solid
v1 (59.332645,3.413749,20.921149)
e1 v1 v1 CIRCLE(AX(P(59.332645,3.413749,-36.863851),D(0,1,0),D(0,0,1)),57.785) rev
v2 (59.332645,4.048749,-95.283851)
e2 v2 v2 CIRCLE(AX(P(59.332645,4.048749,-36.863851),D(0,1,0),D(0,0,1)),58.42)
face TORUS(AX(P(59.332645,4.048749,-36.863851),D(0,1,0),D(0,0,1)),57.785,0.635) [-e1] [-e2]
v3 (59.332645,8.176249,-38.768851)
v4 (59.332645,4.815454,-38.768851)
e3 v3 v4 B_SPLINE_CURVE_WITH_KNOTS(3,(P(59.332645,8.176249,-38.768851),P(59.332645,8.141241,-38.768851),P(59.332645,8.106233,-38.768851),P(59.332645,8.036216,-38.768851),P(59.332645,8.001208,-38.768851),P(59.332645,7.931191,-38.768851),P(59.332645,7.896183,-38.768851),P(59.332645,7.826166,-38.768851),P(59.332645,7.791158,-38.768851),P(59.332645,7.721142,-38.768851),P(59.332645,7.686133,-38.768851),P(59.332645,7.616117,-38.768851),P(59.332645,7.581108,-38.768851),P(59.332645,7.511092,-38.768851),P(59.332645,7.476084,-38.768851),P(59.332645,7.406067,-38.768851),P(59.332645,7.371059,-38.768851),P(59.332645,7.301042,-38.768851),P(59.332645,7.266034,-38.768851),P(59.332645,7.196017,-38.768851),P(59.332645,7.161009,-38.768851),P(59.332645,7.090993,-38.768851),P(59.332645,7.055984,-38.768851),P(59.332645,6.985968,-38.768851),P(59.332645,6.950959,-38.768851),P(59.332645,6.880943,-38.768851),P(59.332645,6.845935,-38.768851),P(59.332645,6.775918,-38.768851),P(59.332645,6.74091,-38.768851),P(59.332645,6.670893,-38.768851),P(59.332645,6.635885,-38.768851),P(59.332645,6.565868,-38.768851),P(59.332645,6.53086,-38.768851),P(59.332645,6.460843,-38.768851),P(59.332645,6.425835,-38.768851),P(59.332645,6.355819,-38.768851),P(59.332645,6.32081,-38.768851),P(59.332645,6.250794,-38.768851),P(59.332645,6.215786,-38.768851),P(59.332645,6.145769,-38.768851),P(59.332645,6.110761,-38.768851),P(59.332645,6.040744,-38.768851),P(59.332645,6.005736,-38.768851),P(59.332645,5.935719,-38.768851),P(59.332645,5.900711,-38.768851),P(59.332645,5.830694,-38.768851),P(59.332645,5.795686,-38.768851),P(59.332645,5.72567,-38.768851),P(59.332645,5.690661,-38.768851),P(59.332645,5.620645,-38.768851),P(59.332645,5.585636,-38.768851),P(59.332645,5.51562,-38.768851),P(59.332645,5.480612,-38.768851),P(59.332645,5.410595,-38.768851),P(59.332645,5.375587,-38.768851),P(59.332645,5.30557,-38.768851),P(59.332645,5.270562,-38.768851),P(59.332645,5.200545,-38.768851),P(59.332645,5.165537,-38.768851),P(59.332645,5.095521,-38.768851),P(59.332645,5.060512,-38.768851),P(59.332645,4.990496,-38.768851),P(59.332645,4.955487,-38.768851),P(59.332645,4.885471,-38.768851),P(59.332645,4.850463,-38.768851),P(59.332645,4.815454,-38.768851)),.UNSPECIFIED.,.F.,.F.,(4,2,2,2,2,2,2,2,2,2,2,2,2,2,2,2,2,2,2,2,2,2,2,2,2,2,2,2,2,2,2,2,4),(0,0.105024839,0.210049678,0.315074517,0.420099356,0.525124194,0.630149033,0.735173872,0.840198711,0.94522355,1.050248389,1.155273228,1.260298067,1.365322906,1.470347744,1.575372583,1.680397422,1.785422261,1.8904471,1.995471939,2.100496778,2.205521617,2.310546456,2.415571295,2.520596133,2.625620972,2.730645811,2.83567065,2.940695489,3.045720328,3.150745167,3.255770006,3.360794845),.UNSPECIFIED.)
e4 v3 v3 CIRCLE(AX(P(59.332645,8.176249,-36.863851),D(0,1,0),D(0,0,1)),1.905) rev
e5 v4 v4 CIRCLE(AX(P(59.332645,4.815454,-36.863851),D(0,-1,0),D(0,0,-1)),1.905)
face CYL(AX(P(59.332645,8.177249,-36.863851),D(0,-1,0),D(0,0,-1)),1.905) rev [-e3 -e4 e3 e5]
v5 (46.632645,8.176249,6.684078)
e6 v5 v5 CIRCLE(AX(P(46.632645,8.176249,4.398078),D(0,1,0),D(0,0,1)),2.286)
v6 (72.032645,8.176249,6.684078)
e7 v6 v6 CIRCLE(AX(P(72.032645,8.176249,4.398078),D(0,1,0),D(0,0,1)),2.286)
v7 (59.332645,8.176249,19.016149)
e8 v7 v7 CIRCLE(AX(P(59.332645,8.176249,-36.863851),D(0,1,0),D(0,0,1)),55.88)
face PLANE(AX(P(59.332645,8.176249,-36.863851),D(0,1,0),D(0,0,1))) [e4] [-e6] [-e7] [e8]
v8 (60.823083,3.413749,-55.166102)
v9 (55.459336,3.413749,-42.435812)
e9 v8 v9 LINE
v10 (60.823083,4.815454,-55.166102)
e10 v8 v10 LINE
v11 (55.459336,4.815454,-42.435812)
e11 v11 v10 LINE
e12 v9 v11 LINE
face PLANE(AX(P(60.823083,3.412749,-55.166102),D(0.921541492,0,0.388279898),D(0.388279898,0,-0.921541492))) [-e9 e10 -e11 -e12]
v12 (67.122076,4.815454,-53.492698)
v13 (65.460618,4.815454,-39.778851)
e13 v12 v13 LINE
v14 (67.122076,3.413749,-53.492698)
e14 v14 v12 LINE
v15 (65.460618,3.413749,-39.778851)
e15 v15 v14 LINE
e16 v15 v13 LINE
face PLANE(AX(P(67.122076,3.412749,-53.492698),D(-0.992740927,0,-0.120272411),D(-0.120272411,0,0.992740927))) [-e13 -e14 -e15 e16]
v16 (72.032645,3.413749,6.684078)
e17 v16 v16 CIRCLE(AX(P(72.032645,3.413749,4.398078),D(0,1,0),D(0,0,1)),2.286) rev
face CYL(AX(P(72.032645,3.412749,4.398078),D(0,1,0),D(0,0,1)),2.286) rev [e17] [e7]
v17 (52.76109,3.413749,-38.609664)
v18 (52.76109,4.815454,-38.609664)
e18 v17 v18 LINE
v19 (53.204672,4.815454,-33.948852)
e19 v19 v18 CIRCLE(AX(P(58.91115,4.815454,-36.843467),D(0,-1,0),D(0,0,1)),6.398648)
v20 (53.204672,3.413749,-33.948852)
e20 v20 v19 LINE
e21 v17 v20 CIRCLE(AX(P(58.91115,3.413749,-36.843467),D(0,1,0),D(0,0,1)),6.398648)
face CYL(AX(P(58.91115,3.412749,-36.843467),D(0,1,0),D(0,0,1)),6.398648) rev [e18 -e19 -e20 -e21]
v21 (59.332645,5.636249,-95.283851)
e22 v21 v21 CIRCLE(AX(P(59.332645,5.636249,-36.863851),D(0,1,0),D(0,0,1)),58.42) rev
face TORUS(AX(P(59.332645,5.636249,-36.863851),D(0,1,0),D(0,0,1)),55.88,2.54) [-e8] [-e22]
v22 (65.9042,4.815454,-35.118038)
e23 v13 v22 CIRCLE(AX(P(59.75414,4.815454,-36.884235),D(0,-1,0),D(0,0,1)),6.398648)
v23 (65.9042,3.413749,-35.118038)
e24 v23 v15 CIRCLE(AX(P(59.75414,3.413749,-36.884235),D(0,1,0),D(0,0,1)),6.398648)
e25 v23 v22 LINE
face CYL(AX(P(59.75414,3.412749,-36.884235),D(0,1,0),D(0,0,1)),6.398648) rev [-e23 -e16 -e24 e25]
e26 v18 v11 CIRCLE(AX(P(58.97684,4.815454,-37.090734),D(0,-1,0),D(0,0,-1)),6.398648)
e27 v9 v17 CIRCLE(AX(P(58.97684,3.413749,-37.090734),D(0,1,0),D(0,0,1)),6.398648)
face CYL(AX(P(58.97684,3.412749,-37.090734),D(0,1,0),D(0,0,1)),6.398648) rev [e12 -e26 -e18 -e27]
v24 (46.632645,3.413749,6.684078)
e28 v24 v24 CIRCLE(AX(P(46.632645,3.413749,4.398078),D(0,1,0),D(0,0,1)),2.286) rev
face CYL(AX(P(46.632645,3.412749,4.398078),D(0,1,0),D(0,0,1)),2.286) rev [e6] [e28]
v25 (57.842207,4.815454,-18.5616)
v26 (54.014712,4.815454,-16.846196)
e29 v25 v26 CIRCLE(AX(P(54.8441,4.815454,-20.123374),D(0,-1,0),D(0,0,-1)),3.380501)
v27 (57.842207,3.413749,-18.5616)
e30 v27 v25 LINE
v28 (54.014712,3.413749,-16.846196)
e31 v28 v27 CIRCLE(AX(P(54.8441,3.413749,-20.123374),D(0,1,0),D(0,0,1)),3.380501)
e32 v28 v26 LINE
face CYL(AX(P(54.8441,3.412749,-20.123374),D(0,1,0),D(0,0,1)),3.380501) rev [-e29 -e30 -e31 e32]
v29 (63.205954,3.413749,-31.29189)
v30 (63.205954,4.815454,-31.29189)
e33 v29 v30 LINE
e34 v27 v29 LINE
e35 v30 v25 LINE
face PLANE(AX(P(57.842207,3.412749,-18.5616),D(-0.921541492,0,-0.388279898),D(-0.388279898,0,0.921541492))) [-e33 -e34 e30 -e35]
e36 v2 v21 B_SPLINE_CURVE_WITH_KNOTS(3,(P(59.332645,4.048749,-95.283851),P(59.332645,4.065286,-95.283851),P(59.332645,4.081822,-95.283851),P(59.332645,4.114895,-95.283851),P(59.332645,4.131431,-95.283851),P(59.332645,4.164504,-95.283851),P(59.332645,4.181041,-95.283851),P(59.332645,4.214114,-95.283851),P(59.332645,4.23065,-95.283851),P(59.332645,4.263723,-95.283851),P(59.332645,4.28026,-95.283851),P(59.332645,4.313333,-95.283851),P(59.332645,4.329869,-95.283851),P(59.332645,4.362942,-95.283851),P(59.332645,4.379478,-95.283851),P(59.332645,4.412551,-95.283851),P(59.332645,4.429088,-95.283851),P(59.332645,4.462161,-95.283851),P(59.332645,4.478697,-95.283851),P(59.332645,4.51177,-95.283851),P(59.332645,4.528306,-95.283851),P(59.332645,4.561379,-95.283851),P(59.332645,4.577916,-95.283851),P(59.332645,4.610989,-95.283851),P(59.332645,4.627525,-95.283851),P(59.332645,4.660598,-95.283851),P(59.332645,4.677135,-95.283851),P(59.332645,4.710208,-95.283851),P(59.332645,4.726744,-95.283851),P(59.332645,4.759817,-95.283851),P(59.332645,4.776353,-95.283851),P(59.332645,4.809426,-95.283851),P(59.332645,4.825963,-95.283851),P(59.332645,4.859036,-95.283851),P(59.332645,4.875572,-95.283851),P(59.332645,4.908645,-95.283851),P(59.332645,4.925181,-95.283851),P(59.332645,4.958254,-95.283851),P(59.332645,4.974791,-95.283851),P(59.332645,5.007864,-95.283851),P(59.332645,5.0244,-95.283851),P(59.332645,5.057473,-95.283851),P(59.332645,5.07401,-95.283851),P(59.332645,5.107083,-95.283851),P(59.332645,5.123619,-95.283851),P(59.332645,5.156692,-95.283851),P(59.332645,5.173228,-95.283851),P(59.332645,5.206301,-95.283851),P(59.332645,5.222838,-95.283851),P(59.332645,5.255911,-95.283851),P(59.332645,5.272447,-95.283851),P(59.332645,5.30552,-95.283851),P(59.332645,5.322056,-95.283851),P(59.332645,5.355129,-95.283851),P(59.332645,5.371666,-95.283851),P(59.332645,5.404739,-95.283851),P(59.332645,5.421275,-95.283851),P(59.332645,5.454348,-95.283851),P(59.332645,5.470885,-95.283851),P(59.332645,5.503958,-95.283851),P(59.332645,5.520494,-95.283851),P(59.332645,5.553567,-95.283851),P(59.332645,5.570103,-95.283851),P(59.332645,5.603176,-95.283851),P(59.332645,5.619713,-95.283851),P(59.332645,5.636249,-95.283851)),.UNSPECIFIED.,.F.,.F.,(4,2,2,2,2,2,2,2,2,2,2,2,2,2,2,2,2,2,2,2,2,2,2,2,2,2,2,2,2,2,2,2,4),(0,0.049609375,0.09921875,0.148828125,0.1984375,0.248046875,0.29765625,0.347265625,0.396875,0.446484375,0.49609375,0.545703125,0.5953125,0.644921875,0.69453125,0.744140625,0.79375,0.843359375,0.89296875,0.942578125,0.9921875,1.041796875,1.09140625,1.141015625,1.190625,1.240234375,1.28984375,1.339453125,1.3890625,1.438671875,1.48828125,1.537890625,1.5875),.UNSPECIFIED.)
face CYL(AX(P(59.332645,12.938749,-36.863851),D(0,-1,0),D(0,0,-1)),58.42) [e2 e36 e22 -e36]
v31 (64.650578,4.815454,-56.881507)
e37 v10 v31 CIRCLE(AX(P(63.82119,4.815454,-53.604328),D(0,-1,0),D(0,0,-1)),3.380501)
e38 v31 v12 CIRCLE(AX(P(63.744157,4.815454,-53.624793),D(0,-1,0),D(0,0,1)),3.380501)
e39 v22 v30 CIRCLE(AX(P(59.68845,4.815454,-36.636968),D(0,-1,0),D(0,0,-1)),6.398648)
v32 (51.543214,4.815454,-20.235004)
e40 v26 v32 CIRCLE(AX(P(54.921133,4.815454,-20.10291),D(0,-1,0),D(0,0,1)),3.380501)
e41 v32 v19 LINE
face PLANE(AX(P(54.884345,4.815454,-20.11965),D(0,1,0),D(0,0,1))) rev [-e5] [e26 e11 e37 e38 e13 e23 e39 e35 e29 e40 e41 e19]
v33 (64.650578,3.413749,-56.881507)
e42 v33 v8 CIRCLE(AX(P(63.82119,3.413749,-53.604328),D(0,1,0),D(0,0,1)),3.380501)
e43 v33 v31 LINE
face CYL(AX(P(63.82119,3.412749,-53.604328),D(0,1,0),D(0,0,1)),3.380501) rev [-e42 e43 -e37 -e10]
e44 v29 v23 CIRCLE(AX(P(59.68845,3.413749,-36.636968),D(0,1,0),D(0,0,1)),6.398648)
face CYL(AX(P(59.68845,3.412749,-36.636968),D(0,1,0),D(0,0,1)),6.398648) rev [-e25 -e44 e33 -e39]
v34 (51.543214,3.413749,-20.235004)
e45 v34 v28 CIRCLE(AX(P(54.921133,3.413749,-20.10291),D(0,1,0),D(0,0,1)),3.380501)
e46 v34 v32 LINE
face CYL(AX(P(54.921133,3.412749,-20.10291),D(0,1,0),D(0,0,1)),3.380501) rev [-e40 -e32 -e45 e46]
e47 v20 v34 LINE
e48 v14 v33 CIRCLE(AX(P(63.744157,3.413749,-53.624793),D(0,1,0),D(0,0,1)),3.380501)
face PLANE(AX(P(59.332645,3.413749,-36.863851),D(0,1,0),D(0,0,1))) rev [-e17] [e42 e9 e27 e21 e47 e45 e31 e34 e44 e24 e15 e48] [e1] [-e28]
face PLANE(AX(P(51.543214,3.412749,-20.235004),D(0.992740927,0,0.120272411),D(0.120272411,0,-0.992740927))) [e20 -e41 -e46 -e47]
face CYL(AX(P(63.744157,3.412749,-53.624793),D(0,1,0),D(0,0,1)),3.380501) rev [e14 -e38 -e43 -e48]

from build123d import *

# Parameters (mm, degrees)
COMBINE1_START         = 3.413749169
COMBINE1_OUTLINE_R     = 58.42
COMBINE1_OUTLINE_R_2   = 4.935
COMBINE1_OUTLINE_R_3   = 3.57
COMBINE1_OUTLINE_R_4   = 0.7875
COMBINE1_OUTLINE_R_5   = 3.15
COMBINE1_DEPTH         = 9.525
COMBINE1_START_2       = 4.053454325
COMBINE1_2_OUTLINE_R   = 0.7875
COMBINE1_2_OUTLINE_R_2 = 4.935
COMBINE1_2_OUTLINE_R_3 = 3.57
COMBINE1_2_OUTLINE_R_4 = 3.15
COMBINE1_2_DEPTH       = 8.885294844
CUT_EXTRUDE1_DEPTH     = 0.762
CUT_EXTRUDE2_START     = -4.7625
SKETCH4_R              = 58.42
CUT_EXTRUDE2_DEPTH     = 4.7625
CUT_EXTRUDE3_REACH     = 153.512
SKETCH7_R              = 1.905
FILLET2_R              = 2.54
FILLET5_R              = 0.635
SKETCH9_R              = 1.999996
CUT_EXTRUDE5_DEPTH     = 152.549922909
CUT_EXTRUDE6_REACH     = 153.55
SKETCH10_R             = 2.286
CUT_EXTRUDE9_REACH     = 153.512


with BuildPart() as part:
    # Combine1: read off the stored shape, not the designer's step
    # Combine1 outline → Combine1 (new body)
    # profile 1 of 11: a face of its own
    with BuildSketch(Plane(origin=(0, 0, 0), x_dir=(1, 0, 0), z_dir=(0, 1, 0)).offset(COMBINE1_START)):
        with Locations((59.332644984, 36.863851119)):
            Circle(COMBINE1_OUTLINE_R)
        with BuildLine():
            Line((55.998151143, 41.896996961), (61.361898263, 54.627286485))
            ThreePointArc((61.361898263, 54.627286485), (64.45492948, 56.145051848), (66.38688961, 53.292336674))
            Line((66.38688961, 53.292336674), (64.725431473, 39.578489242))
            ThreePointArc((64.725431473, 39.578489242), (65.167745205, 35.313686074), (62.667138826, 31.830705276))
            Line((62.667138826, 31.830705276), (57.303391705, 19.100415753))
            ThreePointArc((57.303391705, 19.100415753), (54.210360488, 17.58265039), (52.278400358, 20.435365564))
            Line((52.278400358, 20.435365564), (53.939858496, 34.149212996))
            ThreePointArc((53.939858496, 34.149212996), (53.32735594, 36.24102711), (53.497544764, 38.414016164))
            ThreePointArc((53.497544764, 38.414016164), (54.428243632, 40.384966514), (55.998151143, 41.896996961))
        make_face(mode=Mode.SUBTRACT)
    # profile 2 of 11: a face of its own
    with BuildSketch(Plane(origin=(0, 0, 0), x_dir=(1, 0, 0), z_dir=(0, 1, 0)).offset(COMBINE1_START)):
        with Locations((59.332644984, 36.863851119)):
            Circle(COMBINE1_OUTLINE_R_2)
        with Locations((59.332644984, 36.863851118)):
            Circle(COMBINE1_OUTLINE_R_3, mode=Mode.SUBTRACT)
    # profile 3 of 11: a face of its own
    with BuildSketch(Plane(origin=(0, 0, 0), x_dir=(1, 0, 0), z_dir=(0, 1, 0)).offset(COMBINE1_START)):
        with BuildLine():
            ThreePointArc((61.980902459, 43.765255947), (61.42199787, 44.728551416), (60.458702401, 44.169646828))
            ThreePointArc((60.458702401, 44.169646828), (61.01760699, 43.206351359), (61.980902459, 43.765255947))
        make_face()
    # profile 4 of 11: a face of its own
    with BuildSketch(Plane(origin=(0, 0, 0), x_dir=(1, 0, 0), z_dir=(0, 1, 0)).offset(COMBINE1_START)):
        with BuildLine():
            ThreePointArc((62.789684222, 46.809656062), (62.230779633, 47.772951531), (61.267484164, 47.214046943))
            ThreePointArc((61.267484164, 47.214046943), (61.826388753, 46.250751474), (62.789684222, 46.809656062))
        make_face()
    # profile 5 of 11: a face of its own
    with BuildSketch(Plane(origin=(0, 0, 0), x_dir=(1, 0, 0), z_dir=(0, 1, 0)).offset(COMBINE1_START)):
        with Locations((62.837365955, 50.056251617)):
            Circle(COMBINE1_OUTLINE_R_4)
    # profile 6 of 11: a face of its own
    with BuildSketch(Plane(origin=(0, 0, 0), x_dir=(1, 0, 0), z_dir=(0, 1, 0)).offset(COMBINE1_START)):
        with BuildLine():
            ThreePointArc((64.407247747, 52.898456292), (63.848343158, 53.861751761), (62.885047689, 53.302847173))
            ThreePointArc((62.885047689, 53.302847173), (63.443952278, 52.339551704), (64.407247747, 52.898456292))
        make_face()
    # profile 7 of 11: a face of its own
    with BuildSketch(Plane(origin=(0, 0, 0), x_dir=(1, 0, 0), z_dir=(0, 1, 0)).offset(COMBINE1_START)):
        with Locations((57.445487539, 29.76025085)):
            Circle(COMBINE1_OUTLINE_R_4)
    # profile 8 of 11: a face of its own
    with BuildSketch(Plane(origin=(0, 0, 0), x_dir=(1, 0, 0), z_dir=(0, 1, 0)).offset(COMBINE1_START)):
        with Locations((56.636705775, 26.715850735)):
            Circle(COMBINE1_OUTLINE_R_4)
    # profile 9 of 11: a face of its own
    with BuildSketch(Plane(origin=(0, 0, 0), x_dir=(1, 0, 0), z_dir=(0, 1, 0)).offset(COMBINE1_START)):
        with BuildLine():
            ThreePointArc((56.589024042, 23.46925518), (56.030119453, 24.432550649), (55.066823984, 23.873646061))
            ThreePointArc((55.066823984, 23.873646061), (55.625728573, 22.910350592), (56.589024042, 23.46925518))
        make_face()
    # profile 10 of 11: a face of its own
    with BuildSketch(Plane(origin=(0, 0, 0), x_dir=(1, 0, 0), z_dir=(0, 1, 0)).offset(COMBINE1_START)):
        with BuildLine():
            ThreePointArc((55.780242279, 20.424855065), (55.221337691, 21.388150534), (54.258042222, 20.829245946))
            ThreePointArc((54.258042222, 20.829245946), (54.81694681, 19.865950476), (55.780242279, 20.424855065))
        make_face()
    # profile 11 of 11: a face of its own
    with BuildSketch(Plane(origin=(0, 0, 0), x_dir=(1, 0, 0), z_dir=(0, 1, 0)).offset(COMBINE1_START)):
        with Locations((59.332644984, 36.863851119)):
            Circle(COMBINE1_OUTLINE_R_5)
    extrude(amount=COMBINE1_DEPTH)

    # Combine1 2 outline → Combine1 2 (add)
    # profile 1 of 2: a face of its own
    with BuildSketch(Plane(origin=(0, 0, 0), x_dir=(1, 0, 0), z_dir=(0, 1, 0)).offset(COMBINE1_START_2)):
        with BuildLine():
            ThreePointArc((66.38688961, 53.292336674), (64.45492948, 56.145051848), (61.361898263, 54.627286485))
            Line((61.361898263, 54.627286485), (55.998151143, 41.896996961))
            ThreePointArc((55.998151143, 41.896996961), (54.428243632, 40.384966514), (53.497544764, 38.414016164))
            ThreePointArc((53.497544764, 38.414016164), (53.32735594, 36.24102711), (53.939858496, 34.149212996))
            Line((53.939858496, 34.149212996), (52.278400358, 20.435365564))
            ThreePointArc((52.278400358, 20.435365564), (54.210360488, 17.58265039), (57.303391705, 19.100415753))
            Line((57.303391705, 19.100415753), (62.667138826, 31.830705276))
            ThreePointArc((62.667138826, 31.830705276), (65.167745205, 35.313686074), (64.725431473, 39.578489242))
            Line((64.725431473, 39.578489242), (66.38688961, 53.292336674))
        make_face()
        with BuildLine():
            ThreePointArc((55.780242279, 20.424855065), (54.81694681, 19.865950476), (54.258042222, 20.829245946))
            ThreePointArc((54.258042222, 20.829245946), (55.221337691, 21.388150534), (55.780242279, 20.424855065))
        make_face(mode=Mode.SUBTRACT)
        with BuildLine():
            ThreePointArc((56.589024042, 23.46925518), (55.625728573, 22.910350592), (55.066823984, 23.873646061))
            ThreePointArc((55.066823984, 23.873646061), (56.030119453, 24.432550649), (56.589024042, 23.46925518))
        make_face(mode=Mode.SUBTRACT)
        with Locations((56.636705775, 26.715850735)):
            Circle(COMBINE1_2_OUTLINE_R, mode=Mode.SUBTRACT)
        with Locations((57.445487539, 29.760250851)):
            Circle(COMBINE1_2_OUTLINE_R, mode=Mode.SUBTRACT)
        with Locations((59.332644984, 36.863851119)):
            Circle(COMBINE1_2_OUTLINE_R_2, mode=Mode.SUBTRACT)
        with BuildLine():
            ThreePointArc((61.980902459, 43.765255947), (61.01760699, 43.206351359), (60.458702401, 44.169646828))
            ThreePointArc((60.458702401, 44.169646828), (61.42199787, 44.728551416), (61.980902459, 43.765255947))
        make_face(mode=Mode.SUBTRACT)
        with BuildLine():
            ThreePointArc((62.789684222, 46.809656062), (61.826388753, 46.250751474), (61.267484164, 47.214046943))
            ThreePointArc((61.267484164, 47.214046943), (62.230779633, 47.772951531), (62.789684222, 46.809656062))
        make_face(mode=Mode.SUBTRACT)
        with Locations((62.837365955, 50.056251617)):
            Circle(COMBINE1_2_OUTLINE_R, mode=Mode.SUBTRACT)
        with BuildLine():
            ThreePointArc((64.407247747, 52.898456292), (63.443952278, 52.339551704), (62.885047689, 53.302847173))
            ThreePointArc((62.885047689, 53.302847173), (63.848343158, 53.861751761), (64.407247747, 52.898456292))
        make_face(mode=Mode.SUBTRACT)
    # profile 2 of 2: a face of its own
    with BuildSketch(Plane(origin=(0, 0, 0), x_dir=(1, 0, 0), z_dir=(0, 1, 0)).offset(COMBINE1_START_2)):
        with Locations((59.332644984, 36.863851118)):
            Circle(COMBINE1_2_OUTLINE_R_3)
        with Locations((59.332644984, 36.863851119)):
            Circle(COMBINE1_2_OUTLINE_R_4, mode=Mode.SUBTRACT)
    extrude(amount=COMBINE1_2_DEPTH)

    # Sketch1 → Cut-Extrude1 (cut, symmetric)
    with BuildSketch(Plane.XZ.offset(-4.053454325)):
        with BuildLine():
            Line((52.278400358, -20.435365564), (53.939858496, -34.149212996))
            ThreePointArc((53.939858496, -34.149212996), (53.497544764, -38.414016164), (55.998151143, -41.896996961))
            Line((55.998151143, -41.896996961), (61.361898263, -54.627286485))
            ThreePointArc((61.361898263, -54.627286485), (64.45492948, -56.145051848), (66.38688961, -53.292336674))
            Line((66.38688961, -53.292336674), (64.725431473, -39.578489242))
            ThreePointArc((64.725431473, -39.578489242), (65.167745205, -35.313686074), (62.667138826, -31.830705276))
            Line((62.667138826, -31.830705276), (57.303391705, -19.100415753))
            ThreePointArc((57.303391705, -19.100415753), (54.210360488, -17.58265039), (52.278400358, -20.435365564))
        make_face()
    extrude(amount=CUT_EXTRUDE1_DEPTH, both=True, mode=Mode.SUBTRACT)

    # Sketch4 → Cut-Extrude2 (cut)
    with BuildSketch(Plane(origin=(0, 12.938749169, 0), x_dir=(1, 0, 0), z_dir=(0, 1, 0)).offset(CUT_EXTRUDE2_START)):
        with Locations(Location((59.332644984, 36.863851119, 0), (0, 0, 90))):
            Circle(SKETCH4_R)
    extrude(amount=CUT_EXTRUDE2_DEPTH, mode=Mode.SUBTRACT)

    # Sketch7 → Cut-Extrude3 (cut, up to next)
    with BuildSketch(Plane.XZ.offset(-4.815454325), mode=Mode.PRIVATE) as cut_extrude3_sk1:
        with Locations(Location((59.332644984, -36.863851119, 0), (0, 0, 270))):
            Circle(SKETCH7_R)
    cut_extrude3_tool1 = extrude(cut_extrude3_sk1.sketch, amount=-CUT_EXTRUDE3_REACH, mode=Mode.PRIVATE) & part.part
    add(cut_extrude3_tool1.solids().sort_by_distance((59.332645, 4.815454, -36.863851))[0], mode=Mode.SUBTRACT)

    # Fillet2
    fillet2_edges = [part.edges().sort_by_distance(p)[0] for p in [
        (0.912644984, 8.176249169, -36.863851119),
    ]]
    fillet(fillet2_edges, radius=FILLET2_R)

    # Fillet5
    fillet5_edges = [part.edges().sort_by_distance(p)[0] for p in [
        (0.912644984, 3.413749169, -36.863851119),
    ]]
    fillet(fillet5_edges, radius=FILLET5_R)

    # Sketch9 → Cut-Extrude5 (cut, through all)
    with BuildSketch(Plane(origin=(0, 8.176249169, 0), x_dir=(1, 0, 0), z_dir=(0, 1, 0))):
        with Locations(Location((46.632644984, -4.398077679, 0), (0, 0, 270))):
            Circle(SKETCH9_R)
        with Locations(Location((72.032644984, -4.398077679, 0), (0, 0, 90))):
            Circle(SKETCH9_R)
    extrude(amount=-CUT_EXTRUDE5_DEPTH, mode=Mode.SUBTRACT)

    # Sketch10 → Cut-Extrude6 (cut, up to next)
    with BuildSketch(Plane(origin=(0, 8.176249169, 0), x_dir=(1, 0, 0), z_dir=(0, 1, 0)), mode=Mode.PRIVATE) as cut_extrude6_sk1:
        with Locations(Location((46.632644984, -4.398077679, 0), (0, 0, 270))):
            Circle(SKETCH10_R)
    cut_extrude6_tool1 = extrude(cut_extrude6_sk1.sketch, amount=-CUT_EXTRUDE6_REACH, mode=Mode.PRIVATE) & part.part
    # Sketch10 → Cut-Extrude6 (cut, up to next)
    with BuildSketch(Plane(origin=(0, 8.176249169, 0), x_dir=(1, 0, 0), z_dir=(0, 1, 0)), mode=Mode.PRIVATE) as cut_extrude6_sk2:
        with Locations(Location((72.032644984, -4.398077679, 0), (0, 0, 270))):
            Circle(SKETCH10_R)
    cut_extrude6_tool2 = extrude(cut_extrude6_sk2.sketch, amount=-CUT_EXTRUDE6_REACH, mode=Mode.PRIVATE) & part.part
    add(cut_extrude6_tool1.solids().sort_by_distance((46.632645, 8.176249, 4.398078))[0], mode=Mode.SUBTRACT)
    add(cut_extrude6_tool2.solids().sort_by_distance((72.032645, 8.176249, 4.398078))[0], mode=Mode.SUBTRACT)

    # Sketch11 → Cut-Extrude9 (cut, up to next)
    with BuildSketch(Plane.XZ.offset(-4.815454325), mode=Mode.PRIVATE) as cut_extrude9_sk1:
        with BuildLine():
            Line((60.823082896, -55.166101852), (55.459335776, -42.435812329))
            ThreePointArc((55.459335776, -42.435812329), (53.747699314, -40.778387244), (52.761089879, -38.609664323))
            ThreePointArc((52.761089879, -38.609664323), (52.541285954, -36.237230232), (53.204671891, -33.948851682))
            Line((53.204671891, -33.948851682), (51.543213753, -20.235004251))
            ThreePointArc((51.543213753, -20.235004251), (52.189851491, -18.110953809), (54.014712328, -16.846195505))
            ThreePointArc((54.014712328, -16.846195505), (56.22666621, -17.038525088), (57.842207073, -18.561600386))
            Line((57.842207073, -18.561600386), (63.205954193, -31.291889909))
            ThreePointArc((63.205954193, -31.291889909), (64.917590654, -32.949314993), (65.90420009, -35.118037914))
            ThreePointArc((65.90420009, -35.118037914), (66.124004014, -37.490472006), (65.460618078, -39.778850555))
            Line((65.460618078, -39.778850555), (67.122076215, -53.492697987))
            ThreePointArc((67.122076215, -53.492697987), (66.475438477, -55.616748428), (64.65057764, -56.881506733))
            ThreePointArc((64.65057764, -56.881506733), (62.438623759, -56.68917715), (60.823082896, -55.166101852))
        make_face()
    cut_extrude9_tool1 = extrude(cut_extrude9_sk1.sketch, amount=CUT_EXTRUDE9_REACH, mode=Mode.PRIVATE) & part.part
    add(cut_extrude9_tool1.solids().sort_by_distance((59.332645, 4.815454, -36.863851))[0], mode=Mode.SUBTRACT)


solid = part.part
